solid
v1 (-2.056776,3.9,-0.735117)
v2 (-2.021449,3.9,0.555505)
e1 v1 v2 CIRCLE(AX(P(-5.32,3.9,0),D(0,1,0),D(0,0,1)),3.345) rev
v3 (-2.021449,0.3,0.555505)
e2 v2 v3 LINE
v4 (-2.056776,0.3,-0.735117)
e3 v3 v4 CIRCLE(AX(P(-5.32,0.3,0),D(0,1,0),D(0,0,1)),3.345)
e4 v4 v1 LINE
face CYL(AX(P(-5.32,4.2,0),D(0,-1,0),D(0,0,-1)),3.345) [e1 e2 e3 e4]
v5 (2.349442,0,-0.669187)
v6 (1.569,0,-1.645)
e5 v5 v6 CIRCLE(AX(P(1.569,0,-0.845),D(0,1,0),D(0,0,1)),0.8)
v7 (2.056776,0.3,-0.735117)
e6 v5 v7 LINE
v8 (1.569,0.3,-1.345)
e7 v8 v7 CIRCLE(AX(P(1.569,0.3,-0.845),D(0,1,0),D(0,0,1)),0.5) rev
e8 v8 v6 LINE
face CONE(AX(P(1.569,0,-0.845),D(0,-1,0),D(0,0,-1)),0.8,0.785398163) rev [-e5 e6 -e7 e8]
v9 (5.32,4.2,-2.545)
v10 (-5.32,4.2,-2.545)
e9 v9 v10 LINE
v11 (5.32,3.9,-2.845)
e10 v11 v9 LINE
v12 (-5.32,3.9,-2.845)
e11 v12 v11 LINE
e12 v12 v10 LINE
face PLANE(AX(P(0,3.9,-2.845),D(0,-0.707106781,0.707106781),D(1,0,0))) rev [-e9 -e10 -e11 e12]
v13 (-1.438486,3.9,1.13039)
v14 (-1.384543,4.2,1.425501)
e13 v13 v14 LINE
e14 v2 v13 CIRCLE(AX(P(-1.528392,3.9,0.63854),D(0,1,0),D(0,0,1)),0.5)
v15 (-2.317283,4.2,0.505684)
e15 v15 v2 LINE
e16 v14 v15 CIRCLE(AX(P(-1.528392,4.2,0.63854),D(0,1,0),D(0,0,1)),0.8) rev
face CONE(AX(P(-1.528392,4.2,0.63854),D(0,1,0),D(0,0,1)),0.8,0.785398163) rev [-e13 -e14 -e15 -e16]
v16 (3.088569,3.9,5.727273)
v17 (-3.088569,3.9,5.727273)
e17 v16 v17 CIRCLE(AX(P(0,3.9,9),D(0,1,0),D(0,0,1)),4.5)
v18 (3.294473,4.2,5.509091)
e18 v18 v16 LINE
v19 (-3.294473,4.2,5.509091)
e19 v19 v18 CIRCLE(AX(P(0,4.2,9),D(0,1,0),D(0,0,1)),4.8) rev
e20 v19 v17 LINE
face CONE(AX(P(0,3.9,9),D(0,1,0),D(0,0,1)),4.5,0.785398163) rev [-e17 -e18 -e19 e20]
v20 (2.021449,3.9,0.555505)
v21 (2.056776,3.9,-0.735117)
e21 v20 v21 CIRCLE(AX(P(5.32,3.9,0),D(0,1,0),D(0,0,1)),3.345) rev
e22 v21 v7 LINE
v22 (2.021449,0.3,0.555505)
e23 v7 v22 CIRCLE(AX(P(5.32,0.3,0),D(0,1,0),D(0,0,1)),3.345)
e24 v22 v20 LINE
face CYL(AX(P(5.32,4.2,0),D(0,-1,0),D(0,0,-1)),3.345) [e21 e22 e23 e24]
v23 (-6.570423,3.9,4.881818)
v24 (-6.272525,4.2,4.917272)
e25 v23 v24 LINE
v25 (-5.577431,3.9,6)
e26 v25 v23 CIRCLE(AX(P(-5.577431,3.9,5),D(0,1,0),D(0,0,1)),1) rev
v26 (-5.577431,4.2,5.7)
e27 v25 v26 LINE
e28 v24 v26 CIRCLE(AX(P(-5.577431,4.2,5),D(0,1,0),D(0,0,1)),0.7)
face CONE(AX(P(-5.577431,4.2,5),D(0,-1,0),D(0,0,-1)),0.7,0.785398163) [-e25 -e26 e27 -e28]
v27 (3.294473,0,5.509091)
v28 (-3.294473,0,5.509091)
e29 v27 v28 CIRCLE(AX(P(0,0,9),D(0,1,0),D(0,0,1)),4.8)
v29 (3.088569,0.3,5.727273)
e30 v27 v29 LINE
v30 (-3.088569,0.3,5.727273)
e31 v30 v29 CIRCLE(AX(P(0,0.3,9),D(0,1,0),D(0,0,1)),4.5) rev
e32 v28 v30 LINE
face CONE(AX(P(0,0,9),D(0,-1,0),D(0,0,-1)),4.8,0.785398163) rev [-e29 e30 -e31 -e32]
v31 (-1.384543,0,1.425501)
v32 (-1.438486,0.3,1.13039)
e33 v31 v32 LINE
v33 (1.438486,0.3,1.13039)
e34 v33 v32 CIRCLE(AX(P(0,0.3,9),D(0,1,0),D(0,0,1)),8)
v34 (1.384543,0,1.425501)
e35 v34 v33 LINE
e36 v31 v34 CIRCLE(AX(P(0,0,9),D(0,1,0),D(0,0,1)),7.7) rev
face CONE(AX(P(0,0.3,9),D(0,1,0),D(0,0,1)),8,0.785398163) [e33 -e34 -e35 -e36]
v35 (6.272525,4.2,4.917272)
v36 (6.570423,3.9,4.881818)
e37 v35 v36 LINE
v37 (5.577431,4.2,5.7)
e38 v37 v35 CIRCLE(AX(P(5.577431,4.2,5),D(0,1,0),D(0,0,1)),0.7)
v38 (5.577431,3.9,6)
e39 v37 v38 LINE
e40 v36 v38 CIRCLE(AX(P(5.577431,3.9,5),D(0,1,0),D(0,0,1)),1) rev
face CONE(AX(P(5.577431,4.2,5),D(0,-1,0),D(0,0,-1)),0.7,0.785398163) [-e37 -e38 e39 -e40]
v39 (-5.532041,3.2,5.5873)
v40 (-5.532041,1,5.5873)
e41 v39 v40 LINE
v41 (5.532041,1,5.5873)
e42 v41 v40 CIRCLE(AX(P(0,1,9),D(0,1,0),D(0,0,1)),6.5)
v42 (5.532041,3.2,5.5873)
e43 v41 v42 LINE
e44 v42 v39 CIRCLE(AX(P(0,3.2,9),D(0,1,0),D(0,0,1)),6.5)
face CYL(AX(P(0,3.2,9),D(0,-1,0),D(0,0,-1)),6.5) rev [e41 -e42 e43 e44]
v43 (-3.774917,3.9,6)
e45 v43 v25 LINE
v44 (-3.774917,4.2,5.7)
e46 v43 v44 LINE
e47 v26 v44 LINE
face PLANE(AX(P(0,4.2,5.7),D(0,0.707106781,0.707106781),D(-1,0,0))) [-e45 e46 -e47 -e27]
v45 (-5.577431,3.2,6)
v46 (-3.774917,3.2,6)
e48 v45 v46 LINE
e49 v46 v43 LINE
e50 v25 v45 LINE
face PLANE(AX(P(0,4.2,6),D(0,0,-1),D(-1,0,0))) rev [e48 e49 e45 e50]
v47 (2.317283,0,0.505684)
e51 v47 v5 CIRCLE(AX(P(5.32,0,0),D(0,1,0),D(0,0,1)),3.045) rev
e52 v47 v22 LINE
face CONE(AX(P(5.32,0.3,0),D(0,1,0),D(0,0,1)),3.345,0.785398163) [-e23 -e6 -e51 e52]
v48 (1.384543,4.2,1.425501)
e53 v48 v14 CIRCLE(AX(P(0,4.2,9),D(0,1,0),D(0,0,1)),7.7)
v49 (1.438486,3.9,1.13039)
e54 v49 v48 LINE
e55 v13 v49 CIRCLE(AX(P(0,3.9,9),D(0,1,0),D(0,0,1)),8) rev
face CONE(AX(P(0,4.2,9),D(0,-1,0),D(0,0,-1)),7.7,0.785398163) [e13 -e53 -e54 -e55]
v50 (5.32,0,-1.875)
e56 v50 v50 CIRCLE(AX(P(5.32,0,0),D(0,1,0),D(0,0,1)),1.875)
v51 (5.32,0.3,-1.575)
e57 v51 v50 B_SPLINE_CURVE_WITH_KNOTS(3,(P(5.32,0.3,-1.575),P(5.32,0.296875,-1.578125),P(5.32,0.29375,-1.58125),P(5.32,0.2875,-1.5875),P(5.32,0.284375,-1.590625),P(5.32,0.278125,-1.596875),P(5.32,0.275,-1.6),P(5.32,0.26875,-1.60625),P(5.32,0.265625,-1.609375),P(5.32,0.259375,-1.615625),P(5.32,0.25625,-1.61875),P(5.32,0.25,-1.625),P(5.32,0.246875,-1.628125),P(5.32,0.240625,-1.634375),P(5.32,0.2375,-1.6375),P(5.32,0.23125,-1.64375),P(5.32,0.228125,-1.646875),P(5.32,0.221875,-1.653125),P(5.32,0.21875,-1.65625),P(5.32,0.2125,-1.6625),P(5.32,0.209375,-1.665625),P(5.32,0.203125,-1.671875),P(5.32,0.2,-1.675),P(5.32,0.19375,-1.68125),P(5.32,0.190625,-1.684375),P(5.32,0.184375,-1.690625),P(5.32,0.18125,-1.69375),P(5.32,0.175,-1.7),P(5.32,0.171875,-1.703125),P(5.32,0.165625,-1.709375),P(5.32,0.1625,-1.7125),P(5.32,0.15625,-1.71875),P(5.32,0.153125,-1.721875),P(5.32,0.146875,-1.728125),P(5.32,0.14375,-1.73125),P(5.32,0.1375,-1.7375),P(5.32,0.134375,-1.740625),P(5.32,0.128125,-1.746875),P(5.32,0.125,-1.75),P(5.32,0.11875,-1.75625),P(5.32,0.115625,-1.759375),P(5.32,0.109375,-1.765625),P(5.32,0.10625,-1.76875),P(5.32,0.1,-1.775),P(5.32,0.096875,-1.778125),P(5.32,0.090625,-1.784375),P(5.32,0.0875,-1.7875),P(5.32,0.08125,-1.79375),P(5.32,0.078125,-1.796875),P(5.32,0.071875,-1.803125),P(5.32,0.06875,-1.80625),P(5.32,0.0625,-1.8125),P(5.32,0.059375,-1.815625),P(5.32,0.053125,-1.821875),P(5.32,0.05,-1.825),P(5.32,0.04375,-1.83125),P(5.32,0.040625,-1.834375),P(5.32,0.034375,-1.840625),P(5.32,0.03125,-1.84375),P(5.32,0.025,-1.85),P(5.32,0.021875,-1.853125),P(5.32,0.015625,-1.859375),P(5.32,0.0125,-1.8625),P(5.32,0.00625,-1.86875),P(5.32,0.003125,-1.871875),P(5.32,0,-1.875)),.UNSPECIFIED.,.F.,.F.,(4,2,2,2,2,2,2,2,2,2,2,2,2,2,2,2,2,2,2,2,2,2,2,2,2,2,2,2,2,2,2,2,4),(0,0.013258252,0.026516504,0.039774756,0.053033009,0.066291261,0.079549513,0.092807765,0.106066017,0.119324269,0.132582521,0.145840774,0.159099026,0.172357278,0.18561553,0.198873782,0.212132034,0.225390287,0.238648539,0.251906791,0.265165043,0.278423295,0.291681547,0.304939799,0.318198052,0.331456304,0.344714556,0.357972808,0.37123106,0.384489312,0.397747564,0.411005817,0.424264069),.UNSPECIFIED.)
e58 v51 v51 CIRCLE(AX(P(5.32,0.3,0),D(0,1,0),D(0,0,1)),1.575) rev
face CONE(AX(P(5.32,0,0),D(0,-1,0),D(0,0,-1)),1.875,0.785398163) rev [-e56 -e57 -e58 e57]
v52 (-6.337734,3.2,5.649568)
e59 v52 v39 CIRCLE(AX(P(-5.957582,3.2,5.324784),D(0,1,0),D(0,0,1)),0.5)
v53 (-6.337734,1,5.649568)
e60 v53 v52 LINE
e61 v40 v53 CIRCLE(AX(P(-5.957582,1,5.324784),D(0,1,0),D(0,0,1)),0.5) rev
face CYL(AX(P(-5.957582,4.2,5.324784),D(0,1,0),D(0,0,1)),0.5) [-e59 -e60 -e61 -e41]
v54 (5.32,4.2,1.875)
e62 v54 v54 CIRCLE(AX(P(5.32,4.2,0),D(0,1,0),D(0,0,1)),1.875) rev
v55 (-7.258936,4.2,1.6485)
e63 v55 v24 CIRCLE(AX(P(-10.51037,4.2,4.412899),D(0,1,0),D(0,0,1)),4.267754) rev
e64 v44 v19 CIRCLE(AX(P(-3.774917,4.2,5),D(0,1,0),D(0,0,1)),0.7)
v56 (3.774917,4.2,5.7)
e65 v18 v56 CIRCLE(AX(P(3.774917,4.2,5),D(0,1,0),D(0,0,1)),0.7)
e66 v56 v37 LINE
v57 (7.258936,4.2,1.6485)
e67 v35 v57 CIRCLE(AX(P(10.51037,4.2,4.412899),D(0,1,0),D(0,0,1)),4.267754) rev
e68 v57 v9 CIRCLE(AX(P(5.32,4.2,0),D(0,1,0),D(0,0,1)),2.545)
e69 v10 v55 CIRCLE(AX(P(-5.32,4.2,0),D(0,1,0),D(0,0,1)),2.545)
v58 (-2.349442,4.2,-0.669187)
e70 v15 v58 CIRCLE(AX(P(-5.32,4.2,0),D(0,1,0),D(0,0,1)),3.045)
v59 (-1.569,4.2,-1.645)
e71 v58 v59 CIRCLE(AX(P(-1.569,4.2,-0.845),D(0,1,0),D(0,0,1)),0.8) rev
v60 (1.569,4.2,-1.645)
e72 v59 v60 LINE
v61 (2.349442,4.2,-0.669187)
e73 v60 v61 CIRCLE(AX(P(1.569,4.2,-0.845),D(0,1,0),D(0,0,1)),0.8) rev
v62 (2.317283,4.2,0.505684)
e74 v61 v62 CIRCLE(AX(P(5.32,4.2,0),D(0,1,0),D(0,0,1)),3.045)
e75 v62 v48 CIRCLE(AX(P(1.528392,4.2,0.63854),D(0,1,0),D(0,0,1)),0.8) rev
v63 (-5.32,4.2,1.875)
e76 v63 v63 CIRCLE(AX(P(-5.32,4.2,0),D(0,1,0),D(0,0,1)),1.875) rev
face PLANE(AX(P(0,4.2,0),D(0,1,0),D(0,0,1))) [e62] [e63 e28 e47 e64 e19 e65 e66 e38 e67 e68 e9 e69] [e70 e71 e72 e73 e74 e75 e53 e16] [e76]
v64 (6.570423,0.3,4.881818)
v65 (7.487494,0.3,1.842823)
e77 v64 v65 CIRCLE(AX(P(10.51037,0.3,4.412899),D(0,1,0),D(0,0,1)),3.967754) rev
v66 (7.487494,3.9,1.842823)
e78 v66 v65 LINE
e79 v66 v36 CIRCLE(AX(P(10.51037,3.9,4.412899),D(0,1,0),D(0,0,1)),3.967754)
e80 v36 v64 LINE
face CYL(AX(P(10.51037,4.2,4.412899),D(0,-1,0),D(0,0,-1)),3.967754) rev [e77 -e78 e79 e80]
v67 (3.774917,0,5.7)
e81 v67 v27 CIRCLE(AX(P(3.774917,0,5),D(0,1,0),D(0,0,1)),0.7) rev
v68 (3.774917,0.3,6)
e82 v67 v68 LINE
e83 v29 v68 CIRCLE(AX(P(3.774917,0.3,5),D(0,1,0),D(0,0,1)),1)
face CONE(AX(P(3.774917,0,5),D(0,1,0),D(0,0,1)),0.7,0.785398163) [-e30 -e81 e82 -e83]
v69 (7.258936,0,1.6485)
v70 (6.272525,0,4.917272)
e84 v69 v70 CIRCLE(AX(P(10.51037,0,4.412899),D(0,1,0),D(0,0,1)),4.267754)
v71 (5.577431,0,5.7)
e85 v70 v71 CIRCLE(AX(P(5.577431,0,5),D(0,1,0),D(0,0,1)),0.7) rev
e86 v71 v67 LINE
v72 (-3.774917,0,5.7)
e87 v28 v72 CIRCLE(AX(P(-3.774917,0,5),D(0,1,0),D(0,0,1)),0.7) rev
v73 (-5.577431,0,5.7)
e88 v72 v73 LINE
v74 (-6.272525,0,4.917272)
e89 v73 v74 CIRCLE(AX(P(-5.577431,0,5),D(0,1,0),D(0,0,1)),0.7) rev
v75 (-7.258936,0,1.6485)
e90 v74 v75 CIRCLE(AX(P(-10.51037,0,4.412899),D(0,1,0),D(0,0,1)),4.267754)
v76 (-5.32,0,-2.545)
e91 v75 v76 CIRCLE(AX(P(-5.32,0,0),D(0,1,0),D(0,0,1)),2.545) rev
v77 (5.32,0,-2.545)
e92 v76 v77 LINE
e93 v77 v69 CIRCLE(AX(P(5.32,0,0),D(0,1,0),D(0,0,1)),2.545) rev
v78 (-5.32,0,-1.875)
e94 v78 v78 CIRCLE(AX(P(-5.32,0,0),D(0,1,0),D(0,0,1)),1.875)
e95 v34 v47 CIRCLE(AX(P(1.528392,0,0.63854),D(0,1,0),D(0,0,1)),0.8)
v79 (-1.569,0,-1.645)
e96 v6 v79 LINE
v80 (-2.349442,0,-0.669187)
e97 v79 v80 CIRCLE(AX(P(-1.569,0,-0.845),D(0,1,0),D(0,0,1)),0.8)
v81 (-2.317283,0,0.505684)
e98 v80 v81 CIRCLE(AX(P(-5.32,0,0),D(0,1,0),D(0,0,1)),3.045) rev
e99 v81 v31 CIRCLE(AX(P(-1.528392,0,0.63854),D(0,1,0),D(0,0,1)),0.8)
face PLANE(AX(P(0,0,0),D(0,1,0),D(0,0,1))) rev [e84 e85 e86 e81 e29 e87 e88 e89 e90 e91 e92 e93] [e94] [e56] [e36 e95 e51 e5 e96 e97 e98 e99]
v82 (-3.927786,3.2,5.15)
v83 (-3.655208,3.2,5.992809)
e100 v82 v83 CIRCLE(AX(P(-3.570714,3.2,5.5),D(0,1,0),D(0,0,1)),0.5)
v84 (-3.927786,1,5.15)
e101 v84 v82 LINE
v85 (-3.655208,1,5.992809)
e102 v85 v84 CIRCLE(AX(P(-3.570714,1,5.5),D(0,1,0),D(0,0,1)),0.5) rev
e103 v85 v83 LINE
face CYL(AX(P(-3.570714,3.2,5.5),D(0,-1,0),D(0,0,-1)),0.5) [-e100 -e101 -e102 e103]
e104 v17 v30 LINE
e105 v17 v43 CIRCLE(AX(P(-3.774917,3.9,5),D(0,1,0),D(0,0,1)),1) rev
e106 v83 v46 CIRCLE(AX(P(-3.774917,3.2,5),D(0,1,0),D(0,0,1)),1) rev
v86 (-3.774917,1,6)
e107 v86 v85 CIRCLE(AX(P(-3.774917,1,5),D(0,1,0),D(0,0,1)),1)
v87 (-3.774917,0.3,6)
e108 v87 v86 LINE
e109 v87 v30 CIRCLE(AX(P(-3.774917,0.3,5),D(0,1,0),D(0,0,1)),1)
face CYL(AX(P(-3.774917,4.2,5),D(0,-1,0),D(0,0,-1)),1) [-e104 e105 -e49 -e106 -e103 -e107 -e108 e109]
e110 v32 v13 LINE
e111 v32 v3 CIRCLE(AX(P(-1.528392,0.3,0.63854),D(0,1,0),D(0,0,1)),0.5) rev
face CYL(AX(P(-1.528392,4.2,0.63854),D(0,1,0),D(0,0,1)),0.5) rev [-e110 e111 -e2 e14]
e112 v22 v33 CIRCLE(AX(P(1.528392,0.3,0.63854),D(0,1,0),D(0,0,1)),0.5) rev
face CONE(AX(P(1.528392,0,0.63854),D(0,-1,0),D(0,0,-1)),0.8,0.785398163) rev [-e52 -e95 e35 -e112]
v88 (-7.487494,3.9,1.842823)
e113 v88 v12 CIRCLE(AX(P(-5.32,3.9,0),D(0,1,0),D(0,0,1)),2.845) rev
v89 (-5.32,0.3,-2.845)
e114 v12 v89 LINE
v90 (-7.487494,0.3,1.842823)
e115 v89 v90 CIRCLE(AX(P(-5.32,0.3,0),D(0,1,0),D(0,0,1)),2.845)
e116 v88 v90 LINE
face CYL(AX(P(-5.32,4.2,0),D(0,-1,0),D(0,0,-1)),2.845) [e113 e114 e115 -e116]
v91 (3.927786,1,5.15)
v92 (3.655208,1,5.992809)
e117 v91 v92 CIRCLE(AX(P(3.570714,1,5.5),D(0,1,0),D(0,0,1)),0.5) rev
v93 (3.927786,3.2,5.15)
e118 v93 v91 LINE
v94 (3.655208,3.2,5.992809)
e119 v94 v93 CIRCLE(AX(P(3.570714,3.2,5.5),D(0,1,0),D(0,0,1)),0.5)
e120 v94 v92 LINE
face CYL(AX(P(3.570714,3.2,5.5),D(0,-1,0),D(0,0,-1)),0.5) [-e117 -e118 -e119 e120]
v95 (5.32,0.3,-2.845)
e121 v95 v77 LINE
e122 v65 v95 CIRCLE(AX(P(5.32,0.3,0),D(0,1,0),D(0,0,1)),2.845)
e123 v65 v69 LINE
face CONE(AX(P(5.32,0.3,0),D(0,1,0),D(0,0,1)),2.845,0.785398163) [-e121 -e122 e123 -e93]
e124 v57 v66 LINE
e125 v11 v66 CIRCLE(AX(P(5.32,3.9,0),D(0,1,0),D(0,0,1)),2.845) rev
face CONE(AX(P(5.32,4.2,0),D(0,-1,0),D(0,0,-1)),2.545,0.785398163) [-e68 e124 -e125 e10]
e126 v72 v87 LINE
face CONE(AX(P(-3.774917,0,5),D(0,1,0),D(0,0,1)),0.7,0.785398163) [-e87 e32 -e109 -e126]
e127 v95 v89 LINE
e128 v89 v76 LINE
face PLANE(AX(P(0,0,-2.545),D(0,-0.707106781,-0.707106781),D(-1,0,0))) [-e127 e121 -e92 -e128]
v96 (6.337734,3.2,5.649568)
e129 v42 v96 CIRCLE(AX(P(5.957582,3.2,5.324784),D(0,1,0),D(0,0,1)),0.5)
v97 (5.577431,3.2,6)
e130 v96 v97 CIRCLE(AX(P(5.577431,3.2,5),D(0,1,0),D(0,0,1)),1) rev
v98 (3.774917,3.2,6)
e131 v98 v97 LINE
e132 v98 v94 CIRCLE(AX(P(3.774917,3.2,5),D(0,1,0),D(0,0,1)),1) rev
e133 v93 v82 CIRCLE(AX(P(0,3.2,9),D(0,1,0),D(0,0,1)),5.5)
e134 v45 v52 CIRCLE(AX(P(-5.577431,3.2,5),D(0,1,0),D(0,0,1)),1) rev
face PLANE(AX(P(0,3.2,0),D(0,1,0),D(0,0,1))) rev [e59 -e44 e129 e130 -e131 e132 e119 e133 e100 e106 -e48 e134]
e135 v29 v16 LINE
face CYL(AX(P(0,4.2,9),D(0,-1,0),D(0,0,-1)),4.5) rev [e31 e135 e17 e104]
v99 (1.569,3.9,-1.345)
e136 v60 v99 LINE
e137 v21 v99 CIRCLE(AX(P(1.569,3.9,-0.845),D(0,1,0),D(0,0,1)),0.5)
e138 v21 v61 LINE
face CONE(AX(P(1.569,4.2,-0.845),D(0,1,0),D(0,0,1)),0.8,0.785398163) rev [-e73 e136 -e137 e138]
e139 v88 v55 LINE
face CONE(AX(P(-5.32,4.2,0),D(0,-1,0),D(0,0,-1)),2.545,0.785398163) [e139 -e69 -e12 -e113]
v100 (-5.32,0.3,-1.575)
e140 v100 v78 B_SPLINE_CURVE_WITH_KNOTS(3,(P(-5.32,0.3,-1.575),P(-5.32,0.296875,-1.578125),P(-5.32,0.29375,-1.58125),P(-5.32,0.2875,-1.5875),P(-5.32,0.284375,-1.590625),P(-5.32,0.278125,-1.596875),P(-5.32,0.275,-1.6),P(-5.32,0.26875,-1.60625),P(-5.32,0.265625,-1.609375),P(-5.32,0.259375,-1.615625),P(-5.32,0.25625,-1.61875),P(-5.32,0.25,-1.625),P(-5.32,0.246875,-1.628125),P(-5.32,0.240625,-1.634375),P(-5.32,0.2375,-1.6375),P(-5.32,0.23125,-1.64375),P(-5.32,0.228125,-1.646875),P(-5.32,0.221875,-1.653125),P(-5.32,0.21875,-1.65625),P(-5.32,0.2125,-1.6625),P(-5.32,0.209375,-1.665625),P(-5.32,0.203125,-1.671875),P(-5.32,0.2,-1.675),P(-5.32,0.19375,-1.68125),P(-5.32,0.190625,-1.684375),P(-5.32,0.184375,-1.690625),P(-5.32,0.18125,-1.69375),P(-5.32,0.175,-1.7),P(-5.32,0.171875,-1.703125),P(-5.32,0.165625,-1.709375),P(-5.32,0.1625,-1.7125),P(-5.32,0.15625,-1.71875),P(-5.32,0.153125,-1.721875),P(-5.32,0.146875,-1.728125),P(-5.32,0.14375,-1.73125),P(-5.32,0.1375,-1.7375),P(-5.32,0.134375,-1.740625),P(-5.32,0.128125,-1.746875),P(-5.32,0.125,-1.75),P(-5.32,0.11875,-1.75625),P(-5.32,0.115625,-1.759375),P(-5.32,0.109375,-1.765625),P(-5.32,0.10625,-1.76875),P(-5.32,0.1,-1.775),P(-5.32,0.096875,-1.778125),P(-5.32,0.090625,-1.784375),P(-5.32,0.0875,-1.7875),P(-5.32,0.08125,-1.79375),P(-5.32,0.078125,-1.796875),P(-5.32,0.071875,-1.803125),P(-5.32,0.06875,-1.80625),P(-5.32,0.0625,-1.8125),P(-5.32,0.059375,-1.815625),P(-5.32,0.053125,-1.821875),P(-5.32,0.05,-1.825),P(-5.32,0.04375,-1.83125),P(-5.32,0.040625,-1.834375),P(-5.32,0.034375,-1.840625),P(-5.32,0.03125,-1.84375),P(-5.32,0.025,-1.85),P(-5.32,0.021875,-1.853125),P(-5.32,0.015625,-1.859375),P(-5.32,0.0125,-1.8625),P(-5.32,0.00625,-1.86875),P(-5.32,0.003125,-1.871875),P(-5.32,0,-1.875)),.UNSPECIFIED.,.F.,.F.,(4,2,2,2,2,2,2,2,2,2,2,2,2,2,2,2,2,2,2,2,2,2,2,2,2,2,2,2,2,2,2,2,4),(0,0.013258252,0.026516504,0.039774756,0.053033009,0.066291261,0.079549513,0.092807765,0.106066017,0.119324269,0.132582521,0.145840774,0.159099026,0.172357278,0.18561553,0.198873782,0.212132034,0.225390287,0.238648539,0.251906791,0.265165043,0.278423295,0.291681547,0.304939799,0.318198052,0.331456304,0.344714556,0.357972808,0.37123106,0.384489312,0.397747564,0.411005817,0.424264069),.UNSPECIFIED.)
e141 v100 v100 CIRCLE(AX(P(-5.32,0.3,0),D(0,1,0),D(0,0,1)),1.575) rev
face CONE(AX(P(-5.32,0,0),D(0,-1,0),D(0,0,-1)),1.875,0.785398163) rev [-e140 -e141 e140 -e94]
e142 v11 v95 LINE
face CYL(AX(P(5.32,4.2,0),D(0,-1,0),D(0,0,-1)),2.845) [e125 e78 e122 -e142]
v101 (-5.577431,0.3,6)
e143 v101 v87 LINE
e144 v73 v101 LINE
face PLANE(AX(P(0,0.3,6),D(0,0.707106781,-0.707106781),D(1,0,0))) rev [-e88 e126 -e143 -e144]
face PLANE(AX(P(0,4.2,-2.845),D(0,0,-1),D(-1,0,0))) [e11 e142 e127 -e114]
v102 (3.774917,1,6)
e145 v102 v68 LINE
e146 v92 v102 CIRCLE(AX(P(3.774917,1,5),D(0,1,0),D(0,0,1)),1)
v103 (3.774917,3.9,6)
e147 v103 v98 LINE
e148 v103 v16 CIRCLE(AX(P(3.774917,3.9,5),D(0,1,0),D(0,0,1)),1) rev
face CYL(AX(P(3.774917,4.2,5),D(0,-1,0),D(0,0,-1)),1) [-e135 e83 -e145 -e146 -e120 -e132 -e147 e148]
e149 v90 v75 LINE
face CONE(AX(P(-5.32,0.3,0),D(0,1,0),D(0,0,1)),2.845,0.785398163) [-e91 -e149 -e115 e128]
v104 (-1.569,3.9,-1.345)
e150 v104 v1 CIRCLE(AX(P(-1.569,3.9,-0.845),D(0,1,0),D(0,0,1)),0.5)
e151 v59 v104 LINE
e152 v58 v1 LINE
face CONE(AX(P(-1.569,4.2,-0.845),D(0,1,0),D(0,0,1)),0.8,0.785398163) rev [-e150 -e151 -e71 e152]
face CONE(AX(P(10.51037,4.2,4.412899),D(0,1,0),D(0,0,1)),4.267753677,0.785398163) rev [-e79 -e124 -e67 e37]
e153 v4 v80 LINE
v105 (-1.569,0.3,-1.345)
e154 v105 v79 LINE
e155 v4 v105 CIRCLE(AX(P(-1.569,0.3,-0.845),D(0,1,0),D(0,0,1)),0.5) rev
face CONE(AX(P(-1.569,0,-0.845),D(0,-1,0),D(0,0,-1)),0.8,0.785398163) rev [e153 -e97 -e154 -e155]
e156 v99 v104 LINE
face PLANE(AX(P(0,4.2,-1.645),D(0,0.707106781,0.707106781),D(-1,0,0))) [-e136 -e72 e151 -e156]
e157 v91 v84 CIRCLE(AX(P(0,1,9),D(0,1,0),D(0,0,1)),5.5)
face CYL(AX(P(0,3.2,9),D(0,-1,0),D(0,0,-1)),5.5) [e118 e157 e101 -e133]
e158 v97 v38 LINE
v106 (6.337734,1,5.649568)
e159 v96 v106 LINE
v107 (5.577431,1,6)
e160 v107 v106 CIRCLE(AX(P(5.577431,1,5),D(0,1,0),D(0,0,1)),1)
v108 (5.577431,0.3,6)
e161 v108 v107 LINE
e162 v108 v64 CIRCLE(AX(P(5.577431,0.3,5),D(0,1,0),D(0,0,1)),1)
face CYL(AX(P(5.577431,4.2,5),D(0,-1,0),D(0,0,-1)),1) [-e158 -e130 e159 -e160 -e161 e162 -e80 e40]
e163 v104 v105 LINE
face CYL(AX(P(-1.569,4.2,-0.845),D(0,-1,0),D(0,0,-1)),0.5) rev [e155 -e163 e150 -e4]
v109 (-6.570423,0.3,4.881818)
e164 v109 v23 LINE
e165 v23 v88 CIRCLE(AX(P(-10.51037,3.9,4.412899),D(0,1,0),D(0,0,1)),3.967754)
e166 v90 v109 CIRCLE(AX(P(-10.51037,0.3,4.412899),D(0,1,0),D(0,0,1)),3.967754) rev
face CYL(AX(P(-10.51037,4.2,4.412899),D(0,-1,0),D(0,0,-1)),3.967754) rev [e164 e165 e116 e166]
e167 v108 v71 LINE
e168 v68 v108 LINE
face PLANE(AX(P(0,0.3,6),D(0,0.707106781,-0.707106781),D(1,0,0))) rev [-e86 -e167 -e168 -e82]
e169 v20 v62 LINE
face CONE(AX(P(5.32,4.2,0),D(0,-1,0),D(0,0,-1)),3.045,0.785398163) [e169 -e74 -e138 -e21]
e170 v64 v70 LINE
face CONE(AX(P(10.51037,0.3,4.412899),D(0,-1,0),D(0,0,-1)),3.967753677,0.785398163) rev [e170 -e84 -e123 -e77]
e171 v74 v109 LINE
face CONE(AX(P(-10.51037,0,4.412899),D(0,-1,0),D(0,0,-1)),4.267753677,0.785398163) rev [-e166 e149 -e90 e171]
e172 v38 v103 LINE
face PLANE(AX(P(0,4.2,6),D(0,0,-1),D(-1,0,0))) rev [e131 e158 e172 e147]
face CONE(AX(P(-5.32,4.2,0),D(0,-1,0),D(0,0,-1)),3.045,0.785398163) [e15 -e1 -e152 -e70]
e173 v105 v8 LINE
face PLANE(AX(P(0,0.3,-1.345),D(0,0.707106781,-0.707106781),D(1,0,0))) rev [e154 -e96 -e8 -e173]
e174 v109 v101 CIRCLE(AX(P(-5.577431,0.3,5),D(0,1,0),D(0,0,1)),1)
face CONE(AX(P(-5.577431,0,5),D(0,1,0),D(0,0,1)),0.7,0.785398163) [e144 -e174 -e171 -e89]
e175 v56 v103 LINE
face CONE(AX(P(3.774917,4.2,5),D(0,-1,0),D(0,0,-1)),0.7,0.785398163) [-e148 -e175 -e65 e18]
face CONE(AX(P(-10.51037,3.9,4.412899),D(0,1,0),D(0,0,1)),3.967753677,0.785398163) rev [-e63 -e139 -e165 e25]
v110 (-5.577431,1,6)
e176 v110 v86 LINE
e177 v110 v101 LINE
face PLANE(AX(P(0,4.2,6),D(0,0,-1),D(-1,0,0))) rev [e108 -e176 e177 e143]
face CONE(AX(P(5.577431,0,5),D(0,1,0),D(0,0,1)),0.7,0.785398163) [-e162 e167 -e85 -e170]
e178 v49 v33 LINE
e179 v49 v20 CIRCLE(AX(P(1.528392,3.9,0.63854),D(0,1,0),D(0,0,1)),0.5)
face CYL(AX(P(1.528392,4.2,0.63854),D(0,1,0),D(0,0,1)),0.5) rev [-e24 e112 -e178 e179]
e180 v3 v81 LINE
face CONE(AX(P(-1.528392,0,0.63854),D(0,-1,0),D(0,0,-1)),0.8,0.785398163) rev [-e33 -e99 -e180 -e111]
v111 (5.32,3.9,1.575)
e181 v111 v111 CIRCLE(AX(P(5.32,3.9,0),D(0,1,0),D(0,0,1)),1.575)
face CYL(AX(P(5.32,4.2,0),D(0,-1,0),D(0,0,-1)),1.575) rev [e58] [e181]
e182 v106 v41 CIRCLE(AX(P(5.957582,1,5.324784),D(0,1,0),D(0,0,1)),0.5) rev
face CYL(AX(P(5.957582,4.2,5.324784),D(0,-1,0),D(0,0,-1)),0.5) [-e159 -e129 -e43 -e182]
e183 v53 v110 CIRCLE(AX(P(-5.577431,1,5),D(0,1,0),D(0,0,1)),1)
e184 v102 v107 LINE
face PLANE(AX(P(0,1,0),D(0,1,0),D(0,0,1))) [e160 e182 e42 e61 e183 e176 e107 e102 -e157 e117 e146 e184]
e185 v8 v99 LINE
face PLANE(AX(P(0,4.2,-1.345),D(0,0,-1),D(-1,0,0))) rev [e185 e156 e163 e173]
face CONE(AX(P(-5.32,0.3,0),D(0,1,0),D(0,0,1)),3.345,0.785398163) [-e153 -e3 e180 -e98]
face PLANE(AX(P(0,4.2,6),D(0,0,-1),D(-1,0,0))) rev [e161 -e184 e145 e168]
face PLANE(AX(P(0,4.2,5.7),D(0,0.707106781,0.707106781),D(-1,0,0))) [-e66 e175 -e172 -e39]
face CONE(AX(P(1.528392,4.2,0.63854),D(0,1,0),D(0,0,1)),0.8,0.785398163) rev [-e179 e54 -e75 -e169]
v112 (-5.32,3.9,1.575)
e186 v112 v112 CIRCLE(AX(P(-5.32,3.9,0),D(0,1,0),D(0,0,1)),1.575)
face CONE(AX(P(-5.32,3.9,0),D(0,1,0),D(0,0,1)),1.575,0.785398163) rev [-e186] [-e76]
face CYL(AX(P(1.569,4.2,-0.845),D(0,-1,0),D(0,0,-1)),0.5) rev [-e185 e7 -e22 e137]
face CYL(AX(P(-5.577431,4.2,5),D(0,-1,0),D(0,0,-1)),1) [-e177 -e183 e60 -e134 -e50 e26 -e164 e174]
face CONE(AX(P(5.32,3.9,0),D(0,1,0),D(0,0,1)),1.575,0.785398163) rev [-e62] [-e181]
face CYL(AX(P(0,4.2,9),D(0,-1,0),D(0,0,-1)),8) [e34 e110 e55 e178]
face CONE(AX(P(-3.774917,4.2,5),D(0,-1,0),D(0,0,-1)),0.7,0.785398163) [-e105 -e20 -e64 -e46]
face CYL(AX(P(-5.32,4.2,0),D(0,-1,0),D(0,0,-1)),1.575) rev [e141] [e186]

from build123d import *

# Parameters (mm, degrees)
SKETCH1_R           = 1.575
BOSS_EXTRUDE1_DEPTH = 4.2
CUT_EXTRUDE1_START  = 1
CUT_EXTRUDE1_DEPTH  = 2.2
FILLET1_R           = 1
FILLET2_R           = 0.5
FILLET7_R           = 0.5
FILLET8_R           = 1
SKETCH1_5_R         = 1.575
CUT_EXTRUDE2_DEPTH  = 12.345581829
FILLET9_R           = 0.5
CHAMFER1_SIZE       = 0.3


with BuildPart() as part:
    # Sketch1 → Boss-Extrude1 (new body)
    with BuildSketch(Plane(origin=(0, 0, 0), x_dir=(1, 0, 0), z_dir=(0, 1, 0))):
        with BuildLine():
            ThreePointArc((6.873863542, -6), (6.585147062, -3.833506375), (7.487493929, -1.842822581))
            ThreePointArc((7.487493929, -1.842822581), (7.902329882, 1.193983827), (5.32, 2.845))
            Line((5.32, 2.845), (-3.560738791, 2.845))
            ThreePointArc((-3.560738791, 2.845), (-8.244788973, 1.623155712), (-6.803439361, -2.998071491))
            ThreePointArc((-6.803439361, -2.998071491), (-6.543707564, -4.505955025), (-6.873863542, -6))
            Line((-6.873863542, -6), (-3.354101966, -6))
            ThreePointArc((-3.354101966, -6), (0, -4.5), (3.354101966, -6))
            Line((3.354101966, -6), (6.873863542, -6))
        make_face()
        with BuildLine():
            Line((-2.257321434, 1.345), (2.257321434, 1.345))
            ThreePointArc((2.257321434, 1.345), (1.975023179, 0.012452465), (2.247392302, -1.322159949))
            ThreePointArc((2.247392302, -1.322159949), (0, -1), (-2.247392302, -1.322159949))
            ThreePointArc((-2.247392302, -1.322159949), (-1.975023179, 0.012452465), (-2.257321434, 1.345))
        make_face(mode=Mode.SUBTRACT)
        with Locations(Location((5.32, 0, 0), (0, 0, 270))):
            Circle(SKETCH1_R, mode=Mode.SUBTRACT)
    extrude(amount=BOSS_EXTRUDE1_DEPTH)

    # Sketch1<4> → Cut-Extrude1 (cut)
    with BuildSketch(Plane(origin=(0, 0, 0), x_dir=(1, 0, 0), z_dir=(0, 1, 0)).offset(CUT_EXTRUDE1_START)):
        with BuildLine():
            ThreePointArc((5.766281297, -6), (0, -2.5), (-5.766281297, -6))
            Line((-5.766281297, -6), (-4.609772229, -6))
            ThreePointArc((-4.609772229, -6), (0, -3.5), (4.609772229, -6))
            Line((4.609772229, -6), (5.766281297, -6))
        make_face()
        with BuildLine():
            Line((-4.609772229, -6), (-5.766281297, -6))
            ThreePointArc((-5.766281297, -6), (-1.544210408, -15.313906415), (6.5, -9))
            ThreePointArc((6.5, -9), (6.313906415, -7.455789592), (5.766281297, -6))
            Line((5.766281297, -6), (4.609772229, -6))
            ThreePointArc((4.609772229, -6), (5.272748205, -7.435351039), (5.5, -9))
            ThreePointArc((5.5, -9), (-1.564648961, -14.272748205), (-4.609772229, -6))
        make_face()
    extrude(amount=CUT_EXTRUDE1_DEPTH, mode=Mode.SUBTRACT)

    # Fillet1
    # the kernel refuses this fillet: 1 mm, written as the material it takes off along each edge
    with BuildSketch(Plane(origin=(6.873863542, -3.241082043, 6), x_dir=(-1, 0, 0), z_dir=(0, 1, 0))) as fillet1_piece_1:
        with BuildLine():
            CenterArc((1.296432817, -1), FILLET1_R, 90, 96.787220168)
            ThreePointArc((0.303440924, -1.118182484), (0.19275538, -0.547955606), (0, 0))
            Line((0, 0), (1.296432817, 0))
        make_face()
    extrude(amount=10.682164085, mode=Mode.SUBTRACT)
    with BuildSketch(Plane(origin=(-6.873863542, -3.241082043, 6), x_dir=(1, 0, 0), z_dir=(0, 1, 0))) as fillet1_piece_2:
        with BuildLine():
            CenterArc((1.296432817, 1), FILLET1_R, 173.212779832, 96.787220168)
            ThreePointArc((0.303440924, 1.118182484), (0.19275538, 0.547955606), (0, 0))
            Line((0, 0), (1.296432817, 0))
        make_face()
    extrude(amount=10.682164085, mode=Mode.SUBTRACT)

    # Fillet2
    fillet2_edges = [part.edges().sort_by_distance(p)[0] for p in [
        (4.609772229, 2.1, 6),
        (-4.609772229, 2.1, 6),
    ]]
    fillet(fillet2_edges, radius=FILLET2_R)

    # Fillet7
    fillet7_edges = [part.edges().sort_by_distance(p)[0] for p in [
        (-5.757725838, 2.1, 5.983612562),
        (5.757725838, 2.1, 5.983612562),
    ]]
    fillet(fillet7_edges, radius=FILLET7_R)

    # Fillet8
    # the kernel refuses this fillet: 1 mm, written as the material it takes off along each edge
    with BuildSketch(Plane(origin=(3.354101966, -1.052038128, 6), x_dir=(-0.6975938840244129, 0, -0.7164933865512882), z_dir=(0, 1, 0))) as fillet8_piece_1:
        with BuildLine():
            CenterArc((0.422935241, -0.999105229), FILLET8_R, 92.423963438, 43.341758227)
            Line((-0.293558146, -0.301511345), (0, 0))
            ThreePointArc((0, 0), (0.190320858, -0.004026471), (0.380641717, 0))
        make_face()
    extrude(amount=6.304076257, mode=Mode.SUBTRACT)
    with BuildSketch(Plane(origin=(-3.354101966, -1.052038128, 6), x_dir=(-1, 0, 0), z_dir=(0, 1, 0))) as fillet8_piece_2:
        with BuildLine():
            CenterArc((0.420815251, -1), FILLET8_R, 90, 43.341758227)
            ThreePointArc((-0.265533334, -0.272727273), (-0.129881727, -0.139172478), (0, 0))
            Line((0, 0), (0.420815251, 0))
        make_face()
    extrude(amount=6.304076257, mode=Mode.SUBTRACT)

    # Sketch1<5> → Cut-Extrude2 (cut, through all)
    with BuildSketch(Plane(origin=(0, 0, 0), x_dir=(1, 0, 0), z_dir=(0, 1, 0))):
        with BuildLine():
            ThreePointArc((-3.560738791, 2.845), (-8.244788973, 1.623155712), (-6.803439361, -2.998071491))
            ThreePointArc((-6.803439361, -2.998071491), (-7.096248647, -2.391303709), (-7.487493929, -1.842822581))
            ThreePointArc((-7.487493929, -1.842822581), (-7.902329882, 1.193983827), (-5.32, 2.845))
            Line((-5.32, 2.845), (-3.560738791, 2.845))
        make_face()
        with Locations(Location((-5.32, 0, 0), (0, 0, 270))):
            Circle(SKETCH1_5_R)
    extrude(amount=CUT_EXTRUDE2_DEPTH, mode=Mode.SUBTRACT)

    # Fillet9
    fillet9_edges = [part.edges().sort_by_distance(p)[0] for p in [
        (2.257321434, 2.1, -1.345),
        (-2.257321434, 2.1, -1.345),
        (-2.247392302, 2.1, 1.322159949),
        (2.247392302, 2.1, 1.322159949),
    ]]
    fillet(fillet9_edges, radius=FILLET9_R)

    # Chamfer1
    chamfer1_edges = [part.edges().sort_by_distance(p)[0] for p in [
        (6.325154767, 0, 5.664009607),
        (-6.711804448, 4.2, 3.266613185),
        (-4.676173972, 4.2, 6),
        (-6.325154767, 4.2, 5.664009607),
        (6.325154767, 4.2, 5.664009607),
        (7.902329882, 4.2, -1.193983827),
        (5.32, 0, -1.575),
        (4.676173972, 4.2, 6),
        (4.676173972, 0, 6),
        (0, 0, 4.5),
        (-3.405642745, 0, 5.929320377),
        (3.405642745, 0, 5.929320377),
        (0, 4.2, 4.5),
        (-3.405642745, 4.2, 5.929320377),
        (3.405642745, 4.2, 5.929320377),
        (7.902329882, 0, -1.193983827),
        (-7.902329882, 4.2, -1.193983827),
        (-7.902329882, 0, -1.193983827),
        (-5.32, 0, -1.575),
        (-5.32, 4.2, -1.575),
        (0, 0, 1),
        (0, 4.2, 1),
        (1.976252426, 0, -0.091526844),
        (1.976252426, 4.2, -0.091526844),
        (0, 0, -1.345),
        (0, 4.2, -1.345),
        (-1.976252426, 0, -0.091526844),
        (-1.976252426, 4.2, -0.091526844),
        (1.87947049, 0, 0.994550688),
        (1.87947049, 4.2, 0.994550688),
        (1.959475153, 0, -1.157296748),
        (1.959475153, 4.2, -1.157296748),
        (-1.959475153, 0, -1.157296748),
        (-1.959475153, 4.2, -1.157296748),
        (-1.87947049, 0, 0.994550688),
        (-1.87947049, 4.2, 0.994550688),
        (0, 0, -2.845),
        (0, 4.2, -2.845),
        (5.32, 4.2, -1.575),
        (6.711804448, 0, 3.266613185),
        (6.711804448, 4.2, 3.266613185),
        (-4.676173972, 0, 6),
        (-6.711804448, 0, 3.266613185),
        (-6.325154767, 0, 5.664009607),
    ]]
    chamfer(chamfer1_edges, length=CHAMFER1_SIZE)


solid = part.part
